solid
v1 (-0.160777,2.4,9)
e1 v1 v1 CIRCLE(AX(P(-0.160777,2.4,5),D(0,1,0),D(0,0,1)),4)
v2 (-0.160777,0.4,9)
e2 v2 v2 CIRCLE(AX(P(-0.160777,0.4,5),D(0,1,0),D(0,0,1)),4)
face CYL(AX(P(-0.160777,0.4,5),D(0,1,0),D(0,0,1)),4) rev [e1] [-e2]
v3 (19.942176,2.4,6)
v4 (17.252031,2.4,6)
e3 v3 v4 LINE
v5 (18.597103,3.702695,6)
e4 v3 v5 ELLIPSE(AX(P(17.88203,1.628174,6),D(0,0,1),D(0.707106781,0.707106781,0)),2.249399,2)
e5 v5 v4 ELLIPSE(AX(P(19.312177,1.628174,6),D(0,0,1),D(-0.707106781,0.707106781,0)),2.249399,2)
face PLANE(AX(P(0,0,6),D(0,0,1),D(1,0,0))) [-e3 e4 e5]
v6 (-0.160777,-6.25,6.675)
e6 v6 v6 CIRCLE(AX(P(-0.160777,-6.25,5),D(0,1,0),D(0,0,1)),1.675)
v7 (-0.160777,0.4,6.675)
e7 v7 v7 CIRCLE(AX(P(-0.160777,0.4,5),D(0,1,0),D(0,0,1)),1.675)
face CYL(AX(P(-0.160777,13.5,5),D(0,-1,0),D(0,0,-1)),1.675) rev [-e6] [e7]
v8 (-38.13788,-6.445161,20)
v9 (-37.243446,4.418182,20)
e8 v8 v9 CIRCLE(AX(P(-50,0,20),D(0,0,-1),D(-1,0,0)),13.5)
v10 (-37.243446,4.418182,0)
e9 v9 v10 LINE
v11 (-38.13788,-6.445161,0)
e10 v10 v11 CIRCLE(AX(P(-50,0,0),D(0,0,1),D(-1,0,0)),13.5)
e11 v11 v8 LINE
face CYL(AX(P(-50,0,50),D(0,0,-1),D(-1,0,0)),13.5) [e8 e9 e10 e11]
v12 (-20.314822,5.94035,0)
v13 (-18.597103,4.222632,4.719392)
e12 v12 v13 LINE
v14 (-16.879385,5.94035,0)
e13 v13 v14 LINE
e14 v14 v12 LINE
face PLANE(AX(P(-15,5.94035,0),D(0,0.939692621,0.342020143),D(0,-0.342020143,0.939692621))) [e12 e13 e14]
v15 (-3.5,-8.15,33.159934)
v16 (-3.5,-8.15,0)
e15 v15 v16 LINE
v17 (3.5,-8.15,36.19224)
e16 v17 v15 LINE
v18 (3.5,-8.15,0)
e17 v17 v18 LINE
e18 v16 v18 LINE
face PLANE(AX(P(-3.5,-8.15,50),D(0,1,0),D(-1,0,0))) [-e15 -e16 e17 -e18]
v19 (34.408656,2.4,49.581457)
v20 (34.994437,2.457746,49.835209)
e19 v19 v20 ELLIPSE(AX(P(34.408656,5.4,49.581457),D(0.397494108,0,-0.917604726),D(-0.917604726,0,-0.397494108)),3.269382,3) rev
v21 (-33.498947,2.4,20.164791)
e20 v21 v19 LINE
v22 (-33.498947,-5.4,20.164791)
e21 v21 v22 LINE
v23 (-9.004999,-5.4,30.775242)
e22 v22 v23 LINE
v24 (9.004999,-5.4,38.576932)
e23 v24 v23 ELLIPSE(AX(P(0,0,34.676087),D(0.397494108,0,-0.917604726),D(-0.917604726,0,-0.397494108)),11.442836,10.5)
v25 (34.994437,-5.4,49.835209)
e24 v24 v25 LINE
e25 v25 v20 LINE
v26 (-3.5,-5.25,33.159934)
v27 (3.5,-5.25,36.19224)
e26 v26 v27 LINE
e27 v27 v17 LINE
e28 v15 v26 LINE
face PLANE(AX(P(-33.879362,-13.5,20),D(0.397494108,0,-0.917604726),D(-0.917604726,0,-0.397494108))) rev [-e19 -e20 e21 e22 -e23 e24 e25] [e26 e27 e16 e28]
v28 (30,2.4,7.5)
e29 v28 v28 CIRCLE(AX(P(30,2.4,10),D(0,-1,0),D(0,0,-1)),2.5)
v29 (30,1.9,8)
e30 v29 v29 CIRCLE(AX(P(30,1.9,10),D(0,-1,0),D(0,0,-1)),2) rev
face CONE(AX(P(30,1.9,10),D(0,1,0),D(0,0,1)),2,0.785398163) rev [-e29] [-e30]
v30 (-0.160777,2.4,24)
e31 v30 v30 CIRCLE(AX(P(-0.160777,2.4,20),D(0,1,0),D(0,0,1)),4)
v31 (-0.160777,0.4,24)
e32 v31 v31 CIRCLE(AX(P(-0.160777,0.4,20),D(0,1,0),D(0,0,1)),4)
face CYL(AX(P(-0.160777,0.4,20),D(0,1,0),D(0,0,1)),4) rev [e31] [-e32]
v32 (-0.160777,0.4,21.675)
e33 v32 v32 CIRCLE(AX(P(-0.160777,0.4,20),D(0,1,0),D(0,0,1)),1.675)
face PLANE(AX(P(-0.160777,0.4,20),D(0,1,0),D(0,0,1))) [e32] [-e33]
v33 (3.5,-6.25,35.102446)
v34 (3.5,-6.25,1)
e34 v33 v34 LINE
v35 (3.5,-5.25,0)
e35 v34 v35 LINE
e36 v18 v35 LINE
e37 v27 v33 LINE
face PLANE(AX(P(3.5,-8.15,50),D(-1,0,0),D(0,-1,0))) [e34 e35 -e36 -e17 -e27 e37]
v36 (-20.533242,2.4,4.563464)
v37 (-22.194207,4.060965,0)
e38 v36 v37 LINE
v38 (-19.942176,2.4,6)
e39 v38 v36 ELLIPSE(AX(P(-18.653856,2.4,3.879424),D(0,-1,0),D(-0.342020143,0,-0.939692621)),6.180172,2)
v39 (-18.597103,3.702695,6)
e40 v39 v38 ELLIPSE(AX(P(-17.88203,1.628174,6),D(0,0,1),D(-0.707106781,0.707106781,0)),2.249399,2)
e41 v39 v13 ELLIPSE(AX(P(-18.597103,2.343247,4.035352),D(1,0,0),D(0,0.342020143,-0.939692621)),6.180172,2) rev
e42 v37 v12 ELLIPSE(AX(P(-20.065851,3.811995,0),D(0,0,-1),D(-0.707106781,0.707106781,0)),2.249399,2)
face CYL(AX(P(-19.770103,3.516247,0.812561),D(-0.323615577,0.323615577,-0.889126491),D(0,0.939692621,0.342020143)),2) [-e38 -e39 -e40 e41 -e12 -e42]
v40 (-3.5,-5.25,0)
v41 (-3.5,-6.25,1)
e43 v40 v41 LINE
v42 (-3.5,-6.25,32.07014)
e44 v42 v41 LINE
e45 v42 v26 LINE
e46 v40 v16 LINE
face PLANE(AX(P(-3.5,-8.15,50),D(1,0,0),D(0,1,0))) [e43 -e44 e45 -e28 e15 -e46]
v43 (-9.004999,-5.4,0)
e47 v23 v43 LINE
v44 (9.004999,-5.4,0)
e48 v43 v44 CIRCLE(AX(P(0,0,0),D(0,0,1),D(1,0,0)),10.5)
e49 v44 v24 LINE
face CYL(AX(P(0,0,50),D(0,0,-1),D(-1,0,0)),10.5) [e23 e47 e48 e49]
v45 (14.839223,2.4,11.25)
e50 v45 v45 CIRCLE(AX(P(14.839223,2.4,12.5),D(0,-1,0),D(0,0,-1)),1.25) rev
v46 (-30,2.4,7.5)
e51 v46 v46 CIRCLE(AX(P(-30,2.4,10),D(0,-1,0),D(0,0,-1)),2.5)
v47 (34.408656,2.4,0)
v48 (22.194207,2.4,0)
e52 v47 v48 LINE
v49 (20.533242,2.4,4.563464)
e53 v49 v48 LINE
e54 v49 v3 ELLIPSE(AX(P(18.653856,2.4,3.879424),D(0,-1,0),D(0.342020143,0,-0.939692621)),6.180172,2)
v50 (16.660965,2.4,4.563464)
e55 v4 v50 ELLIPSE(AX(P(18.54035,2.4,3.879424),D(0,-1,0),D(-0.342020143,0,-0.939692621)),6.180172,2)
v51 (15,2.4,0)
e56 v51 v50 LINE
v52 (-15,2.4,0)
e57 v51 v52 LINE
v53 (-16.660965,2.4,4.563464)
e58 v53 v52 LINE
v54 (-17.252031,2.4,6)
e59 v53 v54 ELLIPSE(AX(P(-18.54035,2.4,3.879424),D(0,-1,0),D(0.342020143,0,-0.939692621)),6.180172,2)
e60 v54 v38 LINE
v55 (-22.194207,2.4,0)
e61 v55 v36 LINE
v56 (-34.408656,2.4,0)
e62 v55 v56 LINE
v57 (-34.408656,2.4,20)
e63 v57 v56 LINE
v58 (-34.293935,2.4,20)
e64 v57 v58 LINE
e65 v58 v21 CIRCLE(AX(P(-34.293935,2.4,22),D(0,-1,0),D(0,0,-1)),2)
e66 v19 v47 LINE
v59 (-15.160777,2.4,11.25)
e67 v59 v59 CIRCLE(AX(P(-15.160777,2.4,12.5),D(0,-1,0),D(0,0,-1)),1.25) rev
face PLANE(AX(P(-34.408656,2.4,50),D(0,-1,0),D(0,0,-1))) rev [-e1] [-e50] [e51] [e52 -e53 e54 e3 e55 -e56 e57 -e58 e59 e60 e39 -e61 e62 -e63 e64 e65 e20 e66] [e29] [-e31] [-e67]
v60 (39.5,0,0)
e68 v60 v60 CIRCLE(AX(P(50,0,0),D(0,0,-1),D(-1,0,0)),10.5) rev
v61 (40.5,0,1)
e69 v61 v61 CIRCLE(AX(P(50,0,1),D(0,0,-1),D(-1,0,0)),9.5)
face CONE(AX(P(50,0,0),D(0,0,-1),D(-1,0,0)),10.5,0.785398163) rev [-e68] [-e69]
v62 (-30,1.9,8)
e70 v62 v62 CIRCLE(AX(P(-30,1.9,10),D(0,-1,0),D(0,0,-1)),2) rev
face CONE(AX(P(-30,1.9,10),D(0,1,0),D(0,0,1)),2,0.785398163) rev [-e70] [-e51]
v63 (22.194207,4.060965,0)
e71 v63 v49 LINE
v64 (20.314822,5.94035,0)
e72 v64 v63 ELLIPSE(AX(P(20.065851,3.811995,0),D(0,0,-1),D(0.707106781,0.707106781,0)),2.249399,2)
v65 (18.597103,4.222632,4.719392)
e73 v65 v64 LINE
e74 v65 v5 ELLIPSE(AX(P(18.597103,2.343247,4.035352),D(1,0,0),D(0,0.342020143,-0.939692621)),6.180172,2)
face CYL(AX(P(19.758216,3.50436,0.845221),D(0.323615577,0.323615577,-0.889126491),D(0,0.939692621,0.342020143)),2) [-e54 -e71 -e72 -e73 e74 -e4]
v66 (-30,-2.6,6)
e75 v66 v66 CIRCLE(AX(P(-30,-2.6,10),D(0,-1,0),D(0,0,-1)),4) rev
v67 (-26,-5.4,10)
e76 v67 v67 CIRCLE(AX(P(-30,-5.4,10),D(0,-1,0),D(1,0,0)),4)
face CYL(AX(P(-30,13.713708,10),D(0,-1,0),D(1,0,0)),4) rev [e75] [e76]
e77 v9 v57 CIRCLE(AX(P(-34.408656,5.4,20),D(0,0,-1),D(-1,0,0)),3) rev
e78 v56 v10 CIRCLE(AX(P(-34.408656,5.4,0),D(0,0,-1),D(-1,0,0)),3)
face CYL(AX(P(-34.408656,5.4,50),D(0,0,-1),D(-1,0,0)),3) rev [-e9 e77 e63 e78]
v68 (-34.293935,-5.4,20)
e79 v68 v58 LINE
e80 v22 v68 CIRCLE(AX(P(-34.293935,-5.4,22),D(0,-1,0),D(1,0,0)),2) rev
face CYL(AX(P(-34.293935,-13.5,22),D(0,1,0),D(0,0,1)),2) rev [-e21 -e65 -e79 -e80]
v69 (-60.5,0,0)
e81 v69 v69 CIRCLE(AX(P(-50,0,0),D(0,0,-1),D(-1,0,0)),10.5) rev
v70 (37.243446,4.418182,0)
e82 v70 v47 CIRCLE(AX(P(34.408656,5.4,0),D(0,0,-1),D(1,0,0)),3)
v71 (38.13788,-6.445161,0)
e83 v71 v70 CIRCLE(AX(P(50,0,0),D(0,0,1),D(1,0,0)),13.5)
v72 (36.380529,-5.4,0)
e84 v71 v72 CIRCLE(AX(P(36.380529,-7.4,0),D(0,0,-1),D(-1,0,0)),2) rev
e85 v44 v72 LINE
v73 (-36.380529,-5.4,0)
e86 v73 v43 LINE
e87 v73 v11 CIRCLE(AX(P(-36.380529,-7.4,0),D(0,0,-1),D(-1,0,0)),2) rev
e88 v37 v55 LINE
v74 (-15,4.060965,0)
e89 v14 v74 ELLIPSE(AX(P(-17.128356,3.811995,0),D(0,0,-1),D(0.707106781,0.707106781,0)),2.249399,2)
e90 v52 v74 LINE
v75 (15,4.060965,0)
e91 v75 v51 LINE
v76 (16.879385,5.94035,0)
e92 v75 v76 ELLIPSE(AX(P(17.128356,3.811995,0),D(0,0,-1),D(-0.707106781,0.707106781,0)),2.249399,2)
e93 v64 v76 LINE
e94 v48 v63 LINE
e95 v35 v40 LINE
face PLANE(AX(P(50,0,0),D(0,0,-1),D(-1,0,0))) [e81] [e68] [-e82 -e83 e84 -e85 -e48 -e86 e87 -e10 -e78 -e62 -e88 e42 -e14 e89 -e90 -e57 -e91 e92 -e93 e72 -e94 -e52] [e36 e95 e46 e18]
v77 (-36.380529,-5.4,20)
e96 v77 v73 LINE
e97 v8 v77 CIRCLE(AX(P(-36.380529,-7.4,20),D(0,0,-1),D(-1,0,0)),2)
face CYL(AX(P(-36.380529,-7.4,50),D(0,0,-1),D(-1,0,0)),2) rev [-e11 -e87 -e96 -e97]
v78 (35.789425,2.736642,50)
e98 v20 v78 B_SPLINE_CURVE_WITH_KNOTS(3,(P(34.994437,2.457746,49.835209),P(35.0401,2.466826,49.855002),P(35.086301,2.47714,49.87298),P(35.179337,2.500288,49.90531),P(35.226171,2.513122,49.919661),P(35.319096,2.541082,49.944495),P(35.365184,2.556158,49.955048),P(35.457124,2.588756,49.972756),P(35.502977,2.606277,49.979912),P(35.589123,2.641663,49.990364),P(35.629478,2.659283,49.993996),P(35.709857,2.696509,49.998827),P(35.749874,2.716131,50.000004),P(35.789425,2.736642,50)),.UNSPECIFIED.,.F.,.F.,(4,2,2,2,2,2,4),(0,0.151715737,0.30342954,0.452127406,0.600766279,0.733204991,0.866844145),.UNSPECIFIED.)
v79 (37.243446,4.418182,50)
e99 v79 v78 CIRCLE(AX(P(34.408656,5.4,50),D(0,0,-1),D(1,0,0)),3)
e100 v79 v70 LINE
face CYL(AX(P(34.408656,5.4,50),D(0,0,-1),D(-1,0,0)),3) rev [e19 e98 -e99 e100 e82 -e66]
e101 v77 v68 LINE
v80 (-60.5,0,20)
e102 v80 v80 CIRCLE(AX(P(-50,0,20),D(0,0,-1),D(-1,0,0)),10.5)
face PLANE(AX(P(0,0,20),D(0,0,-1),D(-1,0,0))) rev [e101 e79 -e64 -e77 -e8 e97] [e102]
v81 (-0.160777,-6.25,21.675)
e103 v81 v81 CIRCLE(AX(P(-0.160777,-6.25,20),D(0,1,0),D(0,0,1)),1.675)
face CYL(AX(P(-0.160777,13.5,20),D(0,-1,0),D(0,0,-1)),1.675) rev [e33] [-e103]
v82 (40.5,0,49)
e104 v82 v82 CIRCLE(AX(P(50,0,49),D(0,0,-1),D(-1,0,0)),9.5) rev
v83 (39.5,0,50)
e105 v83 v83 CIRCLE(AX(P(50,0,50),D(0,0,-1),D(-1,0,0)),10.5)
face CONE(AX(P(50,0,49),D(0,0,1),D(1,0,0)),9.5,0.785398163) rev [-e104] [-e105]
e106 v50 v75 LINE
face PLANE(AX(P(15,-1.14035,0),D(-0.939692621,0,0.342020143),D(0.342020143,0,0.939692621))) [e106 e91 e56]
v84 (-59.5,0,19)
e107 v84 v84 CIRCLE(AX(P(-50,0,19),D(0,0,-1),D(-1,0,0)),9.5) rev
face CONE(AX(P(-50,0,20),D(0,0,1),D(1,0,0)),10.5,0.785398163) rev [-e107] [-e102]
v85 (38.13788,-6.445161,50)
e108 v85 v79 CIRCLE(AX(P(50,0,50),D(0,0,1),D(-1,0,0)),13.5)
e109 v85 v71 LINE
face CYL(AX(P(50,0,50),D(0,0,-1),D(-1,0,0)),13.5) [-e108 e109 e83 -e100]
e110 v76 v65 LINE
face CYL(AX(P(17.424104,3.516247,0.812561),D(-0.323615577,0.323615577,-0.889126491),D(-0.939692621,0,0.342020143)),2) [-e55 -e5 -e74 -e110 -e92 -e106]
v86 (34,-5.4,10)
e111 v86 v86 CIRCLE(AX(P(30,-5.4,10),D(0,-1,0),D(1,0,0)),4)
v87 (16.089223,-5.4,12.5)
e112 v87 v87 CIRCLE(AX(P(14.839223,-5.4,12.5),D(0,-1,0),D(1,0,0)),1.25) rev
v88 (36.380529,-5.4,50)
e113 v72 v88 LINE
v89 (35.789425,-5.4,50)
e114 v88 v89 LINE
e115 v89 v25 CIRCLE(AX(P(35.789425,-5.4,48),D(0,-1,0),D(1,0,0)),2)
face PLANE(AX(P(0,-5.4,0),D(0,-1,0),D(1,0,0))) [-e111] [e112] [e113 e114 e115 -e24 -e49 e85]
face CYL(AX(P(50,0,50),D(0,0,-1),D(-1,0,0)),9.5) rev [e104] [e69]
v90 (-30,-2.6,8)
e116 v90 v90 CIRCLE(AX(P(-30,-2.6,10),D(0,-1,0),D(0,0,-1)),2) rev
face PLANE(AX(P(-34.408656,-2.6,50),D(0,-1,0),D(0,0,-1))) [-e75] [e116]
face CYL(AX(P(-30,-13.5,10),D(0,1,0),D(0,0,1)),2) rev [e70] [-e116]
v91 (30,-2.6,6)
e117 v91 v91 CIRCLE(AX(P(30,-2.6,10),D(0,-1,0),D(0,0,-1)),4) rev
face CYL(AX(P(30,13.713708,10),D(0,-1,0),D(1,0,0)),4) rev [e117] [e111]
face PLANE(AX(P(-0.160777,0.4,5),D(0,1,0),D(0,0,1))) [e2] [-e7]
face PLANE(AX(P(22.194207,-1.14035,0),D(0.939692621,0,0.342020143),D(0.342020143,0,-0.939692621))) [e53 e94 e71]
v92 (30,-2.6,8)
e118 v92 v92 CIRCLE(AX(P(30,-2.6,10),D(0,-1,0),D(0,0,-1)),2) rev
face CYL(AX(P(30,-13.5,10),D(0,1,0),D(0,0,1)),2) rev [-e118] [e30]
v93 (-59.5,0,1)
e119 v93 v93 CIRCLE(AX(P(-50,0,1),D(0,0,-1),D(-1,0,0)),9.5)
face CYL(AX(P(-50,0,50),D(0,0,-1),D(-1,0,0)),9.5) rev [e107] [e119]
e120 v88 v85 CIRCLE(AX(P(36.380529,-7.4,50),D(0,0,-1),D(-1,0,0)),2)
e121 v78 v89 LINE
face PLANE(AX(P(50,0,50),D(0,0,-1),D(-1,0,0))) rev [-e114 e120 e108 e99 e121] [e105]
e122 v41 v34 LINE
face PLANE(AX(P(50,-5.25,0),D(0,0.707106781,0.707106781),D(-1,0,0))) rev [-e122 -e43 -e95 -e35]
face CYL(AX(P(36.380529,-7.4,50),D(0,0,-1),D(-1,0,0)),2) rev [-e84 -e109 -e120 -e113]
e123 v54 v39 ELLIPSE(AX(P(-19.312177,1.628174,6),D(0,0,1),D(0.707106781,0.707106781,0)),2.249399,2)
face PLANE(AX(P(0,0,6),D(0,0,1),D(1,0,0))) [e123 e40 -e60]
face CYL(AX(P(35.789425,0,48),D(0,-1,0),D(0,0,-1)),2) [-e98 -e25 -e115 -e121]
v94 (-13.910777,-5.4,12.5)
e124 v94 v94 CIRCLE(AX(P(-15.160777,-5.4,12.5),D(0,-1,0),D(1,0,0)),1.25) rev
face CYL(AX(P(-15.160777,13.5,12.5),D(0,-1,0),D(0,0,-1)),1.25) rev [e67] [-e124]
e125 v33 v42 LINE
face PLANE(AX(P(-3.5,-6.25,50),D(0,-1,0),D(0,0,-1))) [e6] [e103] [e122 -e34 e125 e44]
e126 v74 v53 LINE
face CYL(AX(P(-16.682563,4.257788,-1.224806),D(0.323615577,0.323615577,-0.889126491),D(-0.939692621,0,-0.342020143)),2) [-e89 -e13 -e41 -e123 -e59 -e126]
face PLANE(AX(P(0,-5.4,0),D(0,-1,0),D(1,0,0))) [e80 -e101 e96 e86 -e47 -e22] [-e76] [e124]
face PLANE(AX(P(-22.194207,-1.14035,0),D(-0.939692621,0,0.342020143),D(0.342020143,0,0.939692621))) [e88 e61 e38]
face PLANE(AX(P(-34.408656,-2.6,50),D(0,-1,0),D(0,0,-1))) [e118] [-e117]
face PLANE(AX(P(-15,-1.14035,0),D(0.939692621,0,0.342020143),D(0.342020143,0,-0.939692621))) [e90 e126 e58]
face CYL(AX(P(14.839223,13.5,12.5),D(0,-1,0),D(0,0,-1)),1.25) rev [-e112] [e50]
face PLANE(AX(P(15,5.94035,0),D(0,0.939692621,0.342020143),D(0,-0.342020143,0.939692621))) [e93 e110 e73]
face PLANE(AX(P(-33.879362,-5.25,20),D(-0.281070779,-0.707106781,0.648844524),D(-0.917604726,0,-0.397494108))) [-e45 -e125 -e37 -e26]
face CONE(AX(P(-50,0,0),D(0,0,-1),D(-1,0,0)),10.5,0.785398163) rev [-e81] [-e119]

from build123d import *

# Parameters (mm, degrees)
SKETCH1_R                     = 9.5
SKETCH1_W                     = 7
SKETCH1_H                     = 1.9
BOSS_EXTRUDE1_DEPTH           = 50
SKETCH32_W                    = 32.172664372
SKETCH32_H                    = 50
SKETCH32_W_2                  = 30.763378825
BOSS_EXTRUDE4_DEPTH           = 3
SKETCH30_R                    = 1.675
SKETCH30_R_2                  = 1.25
CUT_EXTRUDE14_DEPTH           = 84.200435696
SKETCH31_R                    = 4
CUT_EXTRUDE15_DEPTH           = 2
CHAMFER1_SIZE                 = 1
SKETCH36_R                    = 2
CUT_EXTRUDE18_DEPTH           = 83.371475645
SKETCH37_R                    = 4
CUT_EXTRUDE19_DEPTH           = 2.8
SKETCH38_W                    = 7.194206864
SKETCH38_H                    = 7.080700956
BOSS_EXTRUDE6_DEPTH           = 6
BOSS_EXTRUDE6_DRAFT           = 20
BOSS_EXTRUDE6_PROFILE_2_DEPTH = 6
BOSS_EXTRUDE6_PROFILE_2_DRAFT = 20
FILLET2_R                     = 2
CHAMFER2_SIZE                 = 0.5
CUT_EXTRUDE20_START           = -10
SKETCH39_W                    = 33.713665857
SKETCH39_H                    = 35.884460507
CUT_EXTRUDE20_DEPTH           = 67.252868798
CUT_EXTRUDE21_DEPTH           = 83.371475645
CUT_EXTRUDE21_DEPTH_BACK      = 83.371475645
CHAMFER3_SIZE                 = 1
FILLET3_R                     = 2


with BuildPart() as part:
    # Sketch1 → Boss-Extrude1 (new body)
    with BuildSketch(Plane.XY):
        with BuildLine():
            Line((-34.408656248, 2.4), (34.408656248, 2.4))
            ThreePointArc((34.408656248, 2.4), (36.148562201, 2.95608362), (37.243446021, 4.418181818))
            ThreePointArc((37.243446021, 4.418181818), (52.24014746, 13.312841145), (63.5, 0))
            ThreePointArc((63.5, 0), (59.545941546, -9.545941546), (50, -13.5))
            ThreePointArc((50, -13.5), (42.170423209, -10.99762371), (37.243446021, -4.418181818))
            ThreePointArc((37.243446021, -4.418181818), (36.148562201, -2.95608362), (34.408656248, -2.4))
            Line((34.408656248, -2.4), (12.372954376, -2.4))
            ThreePointArc((12.372954376, -2.4), (10.729786704, -2.89001992), (9.623408959, -4.2))
            ThreePointArc((9.623408959, -4.2), (0, -10.5), (-9.623408959, -4.2))
            ThreePointArc((-9.623408959, -4.2), (-10.729786704, -2.89001992), (-12.372954376, -2.4))
            Line((-12.372954376, -2.4), (-34.408656248, -2.4))
            ThreePointArc((-34.408656248, -2.4), (-36.148562201, -2.95608362), (-37.243446021, -4.418181818))
            ThreePointArc((-37.243446021, -4.418181818), (-42.170423209, -10.99762371), (-50, -13.5))
            ThreePointArc((-50, -13.5), (-59.545941546, -9.545941546), (-63.5, 0))
            ThreePointArc((-63.5, 0), (-52.24014746, 13.312841145), (-37.243446021, 4.418181818))
            ThreePointArc((-37.243446021, 4.418181818), (-36.148562201, 2.95608362), (-34.408656248, 2.4))
        make_face()
        with Locations((50, 0)):
            Circle(SKETCH1_R, mode=Mode.SUBTRACT)
        with Locations(Location((-50, 0, 0), (0, 0, 180))):
            Circle(SKETCH1_R, mode=Mode.SUBTRACT)
        with Locations((0, -7.2)):
            Rectangle(SKETCH1_W, SKETCH1_H, mode=Mode.SUBTRACT)
    extrude(amount=BOSS_EXTRUDE1_DEPTH)

    # Sketch32 → Boss-Extrude4 (add)
    with BuildSketch(Plane.XZ.offset(2.4)):
        with Locations((-22.574766715, 25)):
            Rectangle(SKETCH32_W, SKETCH32_H)
        with Locations((23.370404996, 25)):
            Rectangle(SKETCH32_W_2, SKETCH32_H)
    extrude(amount=BOSS_EXTRUDE4_DEPTH)

    # Sketch30 → Cut-Extrude14 (cut, through all)
    with BuildSketch(Plane(origin=(0, -6.25, 0), x_dir=(1, 0, 0), z_dir=(0, 1, 0))):
        with Locations(Location((-0.160776584, -5, 0), (0, 0, 90))):
            Circle(SKETCH30_R)
        with Locations(Location((-0.160776584, -20, 0), (0, 0, 90))):
            Circle(SKETCH30_R)
        with Locations(Location((14.839223416, -12.5, 0), (0, 0, 90))):
            Circle(SKETCH30_R_2)
        with Locations(Location((-15.160776584, -12.5, 0), (0, 0, 90))):
            Circle(SKETCH30_R_2)
    extrude(amount=CUT_EXTRUDE14_DEPTH, mode=Mode.SUBTRACT)

    # Sketch31 → Cut-Extrude15 (cut)
    with BuildSketch(Plane(origin=(0, 2.4, 0), x_dir=(1, 0, 0), z_dir=(0, 1, 0))):
        with Locations(Location((-0.160776584, -5, 0), (0, 0, 270))):
            Circle(SKETCH31_R)
        with Locations(Location((-0.160776584, -20, 0), (0, 0, 270))):
            Circle(SKETCH31_R)
    extrude(amount=-CUT_EXTRUDE15_DEPTH, mode=Mode.SUBTRACT)

    # Chamfer1
    chamfer1_edges = [part.edges().sort_by_distance(p)[0] for p in [
        (0, -6.25, 0),
        (0, -6.25, 50),
    ]]
    chamfer(chamfer1_edges, length=CHAMFER1_SIZE)

    # Sketch36 → Cut-Extrude18 (cut, through all)
    with BuildSketch(Plane(origin=(0, 2.4, 0), x_dir=(1, 0, 0), z_dir=(0, 1, 0))):
        with Locations(Location((30, -10, 0), (0, 0, 270))):
            Circle(SKETCH36_R)
        with Locations(Location((-30, -10, 0), (0, 0, 270))):
            Circle(SKETCH36_R)
    extrude(amount=-CUT_EXTRUDE18_DEPTH, mode=Mode.SUBTRACT)

    # Sketch37 → Cut-Extrude19 (cut)
    with BuildSketch(Plane.XZ.offset(5.4)):
        with Locations((30, 10)):
            Circle(SKETCH37_R)
        with Locations((-30, 10)):
            Circle(SKETCH37_R)
    extrude(amount=-CUT_EXTRUDE19_DEPTH, mode=Mode.SUBTRACT)


with BuildPart() as boss_extrude6_tool:
    # Sketch38 → Boss-Extrude6 (with draft: the straight prism first)
    with BuildSketch(Plane(origin=(0, 2.4, 0), x_dir=(1, 0, 0), z_dir=(0, 0, 1))):
        with Locations((18.597103432, 0)):
            Rectangle(SKETCH38_W, SKETCH38_H)
    extrude(amount=BOSS_EXTRUDE6_DEPTH)
    # Boss-Extrude6: the draft: its side faces are tilted about the plane it starts from
    boss_extrude6_sides = [boss_extrude6_tool.faces().sort_by_distance(p)[0] for p in [
        (22.194206864, 2.4, 3),
        (18.597103432, 5.940350478, 3),
        (15, 2.4, 3),
        (18.597103432, -1.140350478, 3),
    ]]
    draft(boss_extrude6_sides, Plane(origin=(0, 2.4, 0), x_dir=(1, 0, 0), z_dir=(0, 0, 1)), BOSS_EXTRUDE6_DRAFT)


with BuildPart() as part_1:
    add(part.part)

    # Boss-Extrude6: add boss_extrude6_tool
    add(boss_extrude6_tool.part)


with BuildPart() as boss_extrude6_profile_2_tool:
    # Sketch38 → Boss-Extrude6 profile 2 (with draft: the straight prism first)
    with BuildSketch(Plane(origin=(0, 2.4, 0), x_dir=(1, 0, 0), z_dir=(0, 0, 1))):
        with Locations((-18.597103432, 0)):
            Rectangle(SKETCH38_W, SKETCH38_H)
    extrude(amount=BOSS_EXTRUDE6_PROFILE_2_DEPTH)
    # Boss-Extrude6 profile 2: the draft: its side faces are tilted about the plane it starts from
    boss_extrude6_profile_2_sides = [boss_extrude6_profile_2_tool.faces().sort_by_distance(p)[0] for p in [
        (-15, 2.4, 3),
        (-18.597103432, 5.940350478, 3),
        (-22.194206864, 2.4, 3),
        (-18.597103432, -1.140350478, 3),
    ]]
    draft(boss_extrude6_profile_2_sides, Plane(origin=(0, 2.4, 0), x_dir=(1, 0, 0), z_dir=(0, 0, 1)), BOSS_EXTRUDE6_PROFILE_2_DRAFT)


with BuildPart() as part_2:
    add(part_1.part)

    # Boss-Extrude6 profile 2: add boss_extrude6_profile_2_tool
    add(boss_extrude6_profile_2_tool.part)

    # Fillet2
    # the kernel refuses this fillet: 2 mm, written as the material it takes off along each edge
    with BuildSketch(Plane(origin=(23.632882776, 7.37902639, -3.952729582), x_dir=(0.11068304606838114, -0.946188648339465, -0.30409916978933155), z_dir=(-0.32361557711818506, -0.3236155771181852, 0.8891264907159881))) as fillet2_piece_1_section:
        with BuildLine():
            CenterArc((FILLET2_R * 0.889126490716, -FILLET2_R), FILLET2_R, 90, 83.282286536)
            Line((-FILLET2_R * 0.104008041637, -FILLET2_R * 0.883022221559), (0, 0))
            Line((0, 0), (FILLET2_R * 0.889126490716, 0))
        make_face()
    fillet2_piece_1 = extrude(amount=15.6394611, mode=Mode.PRIVATE)
    fillet2_piece_1 = split(fillet2_piece_1, bisect_by=Plane(origin=(20.940546386, 2.4, 2.229867585), z_dir=(0, 1, 0)), keep=Keep.TOP, mode=Mode.PRIVATE)
    add(fillet2_piece_1, mode=Mode.SUBTRACT)
    with BuildSketch(Plane(origin=(13.561324088, 7.37902639, -3.952729582), x_dir=(0.9461886483394653, 0.1106830460683812, -0.30409916978933144), z_dir=(0.3236155771181851, -0.32361557711818495, 0.8891264907159883))) as fillet2_piece_2_section:
        with BuildLine():
            CenterArc((FILLET2_R * 0.889126490716, -FILLET2_R), FILLET2_R, 90, 83.282286536)
            Line((-FILLET2_R * 0.104008041637, -FILLET2_R * 0.883022221559), (0, 0))
            Line((0, 0), (FILLET2_R * 0.889126490716, 0))
        make_face()
    fillet2_piece_2 = extrude(amount=15.6394611, mode=Mode.PRIVATE)
    fillet2_piece_2 = split(fillet2_piece_2, bisect_by=Plane(origin=(16.253660478, 2.4, 2.229867585), z_dir=(0, 1, 0)), keep=Keep.TOP, mode=Mode.PRIVATE)
    add(fillet2_piece_2, mode=Mode.SUBTRACT)
    with BuildSketch(Plane(origin=(-23.632882776, 7.37902639, -3.952729582), x_dir=(-0.11068304606838135, -0.9461886483394651, -0.3040991697893313), z_dir=(0.32361557711818506, -0.3236155771181851, 0.8891264907159881))) as fillet2_piece_3_section:
        with BuildLine():
            CenterArc((FILLET2_R * 0.889126490716, FILLET2_R), FILLET2_R, 186.717713464, 83.282286536)
            Line((-FILLET2_R * 0.104008041637, FILLET2_R * 0.883022221559), (0, 0))
            Line((0, 0), (FILLET2_R * 0.889126490716, 0))
        make_face()
    fillet2_piece_3 = extrude(amount=15.6394611, mode=Mode.PRIVATE)
    fillet2_piece_3 = split(fillet2_piece_3, bisect_by=Plane(origin=(-20.940546386, 2.4, 2.229867585), z_dir=(0, 1, 0)), keep=Keep.TOP, mode=Mode.PRIVATE)
    add(fillet2_piece_3, mode=Mode.SUBTRACT)
    with BuildSketch(Plane(origin=(-13.561324088, 7.37902639, -3.952729582), x_dir=(0.11068304606838107, -0.9461886483394651, -0.3040991697893313), z_dir=(-0.32361557711818506, -0.323615577118185, 0.8891264907159881))) as fillet2_piece_4_section:
        with BuildLine():
            CenterArc((FILLET2_R * 0.889126490716, -FILLET2_R), FILLET2_R, 90, 83.282286536)
            Line((-FILLET2_R * 0.104008041637, -FILLET2_R * 0.883022221559), (0, 0))
            Line((0, 0), (FILLET2_R * 0.889126490716, 0))
        make_face()
    fillet2_piece_4 = extrude(amount=15.6394611, mode=Mode.PRIVATE)
    fillet2_piece_4 = split(fillet2_piece_4, bisect_by=Plane(origin=(-16.253660478, 2.4, 2.229867585), z_dir=(0, 1, 0)), keep=Keep.TOP, mode=Mode.PRIVATE)
    add(fillet2_piece_4, mode=Mode.SUBTRACT)

    # Chamfer2
    chamfer2_edges = [part_2.edges().sort_by_distance(p)[0] for p in [
        (30, 2.4, 8),
        (-30, 2.4, 8),
    ]]
    chamfer(chamfer2_edges, length=CHAMFER2_SIZE)

    # Sketch39 → Cut-Extrude20 (cut, through all)
    with BuildSketch(Plane(origin=(0, 0, 10), x_dir=(-1, 0, 0), z_dir=(0, 0, -1)).offset(CUT_EXTRUDE20_START)):
        with Locations((50.736194558, -0.327009614)):
            Rectangle(SKETCH39_W, SKETCH39_H)
    extrude(amount=-CUT_EXTRUDE20_DEPTH, mode=Mode.SUBTRACT)

    # Sketch40 → Cut-Extrude21 (cut, two sides: drawn at the far end of the back side and taken through both)
    with BuildSketch(Plane(origin=(0, 2.4, 0), x_dir=(1, 0, 0), z_dir=(0, 1, 0)).offset(-CUT_EXTRUDE21_DEPTH_BACK)):
        Polygon((-33.879361629, -20), (95.398235412, -76.00132788), (-43.756067754, -79.660476008), align=None)
    extrude(amount=CUT_EXTRUDE21_DEPTH + CUT_EXTRUDE21_DEPTH_BACK, mode=Mode.SUBTRACT)

    # Chamfer3
    chamfer3_edges = [part_2.edges().sort_by_distance(p)[0] for p in [
        (-40.5, 0, 20),
        (0, -6.25, 34.676086827),
        (40.5, 0, 0),
        (40.5, 0, 50),
        (-40.5, 0, 0),
    ]]
    chamfer(chamfer3_edges, length=CHAMFER3_SIZE)

    # Fillet3
    fillet3_edges = [part_2.edges().sort_by_distance(p)[0] for p in [
        (-33.879361629, -1.5, 20),
        (35.374851763, -1.42007625, 50),
        (-37.627045624, -5.4, 10),
        (37.627045624, -5.4, 25),
    ]]
    fillet(fillet3_edges, radius=FILLET3_R)


solid = part_2.part
